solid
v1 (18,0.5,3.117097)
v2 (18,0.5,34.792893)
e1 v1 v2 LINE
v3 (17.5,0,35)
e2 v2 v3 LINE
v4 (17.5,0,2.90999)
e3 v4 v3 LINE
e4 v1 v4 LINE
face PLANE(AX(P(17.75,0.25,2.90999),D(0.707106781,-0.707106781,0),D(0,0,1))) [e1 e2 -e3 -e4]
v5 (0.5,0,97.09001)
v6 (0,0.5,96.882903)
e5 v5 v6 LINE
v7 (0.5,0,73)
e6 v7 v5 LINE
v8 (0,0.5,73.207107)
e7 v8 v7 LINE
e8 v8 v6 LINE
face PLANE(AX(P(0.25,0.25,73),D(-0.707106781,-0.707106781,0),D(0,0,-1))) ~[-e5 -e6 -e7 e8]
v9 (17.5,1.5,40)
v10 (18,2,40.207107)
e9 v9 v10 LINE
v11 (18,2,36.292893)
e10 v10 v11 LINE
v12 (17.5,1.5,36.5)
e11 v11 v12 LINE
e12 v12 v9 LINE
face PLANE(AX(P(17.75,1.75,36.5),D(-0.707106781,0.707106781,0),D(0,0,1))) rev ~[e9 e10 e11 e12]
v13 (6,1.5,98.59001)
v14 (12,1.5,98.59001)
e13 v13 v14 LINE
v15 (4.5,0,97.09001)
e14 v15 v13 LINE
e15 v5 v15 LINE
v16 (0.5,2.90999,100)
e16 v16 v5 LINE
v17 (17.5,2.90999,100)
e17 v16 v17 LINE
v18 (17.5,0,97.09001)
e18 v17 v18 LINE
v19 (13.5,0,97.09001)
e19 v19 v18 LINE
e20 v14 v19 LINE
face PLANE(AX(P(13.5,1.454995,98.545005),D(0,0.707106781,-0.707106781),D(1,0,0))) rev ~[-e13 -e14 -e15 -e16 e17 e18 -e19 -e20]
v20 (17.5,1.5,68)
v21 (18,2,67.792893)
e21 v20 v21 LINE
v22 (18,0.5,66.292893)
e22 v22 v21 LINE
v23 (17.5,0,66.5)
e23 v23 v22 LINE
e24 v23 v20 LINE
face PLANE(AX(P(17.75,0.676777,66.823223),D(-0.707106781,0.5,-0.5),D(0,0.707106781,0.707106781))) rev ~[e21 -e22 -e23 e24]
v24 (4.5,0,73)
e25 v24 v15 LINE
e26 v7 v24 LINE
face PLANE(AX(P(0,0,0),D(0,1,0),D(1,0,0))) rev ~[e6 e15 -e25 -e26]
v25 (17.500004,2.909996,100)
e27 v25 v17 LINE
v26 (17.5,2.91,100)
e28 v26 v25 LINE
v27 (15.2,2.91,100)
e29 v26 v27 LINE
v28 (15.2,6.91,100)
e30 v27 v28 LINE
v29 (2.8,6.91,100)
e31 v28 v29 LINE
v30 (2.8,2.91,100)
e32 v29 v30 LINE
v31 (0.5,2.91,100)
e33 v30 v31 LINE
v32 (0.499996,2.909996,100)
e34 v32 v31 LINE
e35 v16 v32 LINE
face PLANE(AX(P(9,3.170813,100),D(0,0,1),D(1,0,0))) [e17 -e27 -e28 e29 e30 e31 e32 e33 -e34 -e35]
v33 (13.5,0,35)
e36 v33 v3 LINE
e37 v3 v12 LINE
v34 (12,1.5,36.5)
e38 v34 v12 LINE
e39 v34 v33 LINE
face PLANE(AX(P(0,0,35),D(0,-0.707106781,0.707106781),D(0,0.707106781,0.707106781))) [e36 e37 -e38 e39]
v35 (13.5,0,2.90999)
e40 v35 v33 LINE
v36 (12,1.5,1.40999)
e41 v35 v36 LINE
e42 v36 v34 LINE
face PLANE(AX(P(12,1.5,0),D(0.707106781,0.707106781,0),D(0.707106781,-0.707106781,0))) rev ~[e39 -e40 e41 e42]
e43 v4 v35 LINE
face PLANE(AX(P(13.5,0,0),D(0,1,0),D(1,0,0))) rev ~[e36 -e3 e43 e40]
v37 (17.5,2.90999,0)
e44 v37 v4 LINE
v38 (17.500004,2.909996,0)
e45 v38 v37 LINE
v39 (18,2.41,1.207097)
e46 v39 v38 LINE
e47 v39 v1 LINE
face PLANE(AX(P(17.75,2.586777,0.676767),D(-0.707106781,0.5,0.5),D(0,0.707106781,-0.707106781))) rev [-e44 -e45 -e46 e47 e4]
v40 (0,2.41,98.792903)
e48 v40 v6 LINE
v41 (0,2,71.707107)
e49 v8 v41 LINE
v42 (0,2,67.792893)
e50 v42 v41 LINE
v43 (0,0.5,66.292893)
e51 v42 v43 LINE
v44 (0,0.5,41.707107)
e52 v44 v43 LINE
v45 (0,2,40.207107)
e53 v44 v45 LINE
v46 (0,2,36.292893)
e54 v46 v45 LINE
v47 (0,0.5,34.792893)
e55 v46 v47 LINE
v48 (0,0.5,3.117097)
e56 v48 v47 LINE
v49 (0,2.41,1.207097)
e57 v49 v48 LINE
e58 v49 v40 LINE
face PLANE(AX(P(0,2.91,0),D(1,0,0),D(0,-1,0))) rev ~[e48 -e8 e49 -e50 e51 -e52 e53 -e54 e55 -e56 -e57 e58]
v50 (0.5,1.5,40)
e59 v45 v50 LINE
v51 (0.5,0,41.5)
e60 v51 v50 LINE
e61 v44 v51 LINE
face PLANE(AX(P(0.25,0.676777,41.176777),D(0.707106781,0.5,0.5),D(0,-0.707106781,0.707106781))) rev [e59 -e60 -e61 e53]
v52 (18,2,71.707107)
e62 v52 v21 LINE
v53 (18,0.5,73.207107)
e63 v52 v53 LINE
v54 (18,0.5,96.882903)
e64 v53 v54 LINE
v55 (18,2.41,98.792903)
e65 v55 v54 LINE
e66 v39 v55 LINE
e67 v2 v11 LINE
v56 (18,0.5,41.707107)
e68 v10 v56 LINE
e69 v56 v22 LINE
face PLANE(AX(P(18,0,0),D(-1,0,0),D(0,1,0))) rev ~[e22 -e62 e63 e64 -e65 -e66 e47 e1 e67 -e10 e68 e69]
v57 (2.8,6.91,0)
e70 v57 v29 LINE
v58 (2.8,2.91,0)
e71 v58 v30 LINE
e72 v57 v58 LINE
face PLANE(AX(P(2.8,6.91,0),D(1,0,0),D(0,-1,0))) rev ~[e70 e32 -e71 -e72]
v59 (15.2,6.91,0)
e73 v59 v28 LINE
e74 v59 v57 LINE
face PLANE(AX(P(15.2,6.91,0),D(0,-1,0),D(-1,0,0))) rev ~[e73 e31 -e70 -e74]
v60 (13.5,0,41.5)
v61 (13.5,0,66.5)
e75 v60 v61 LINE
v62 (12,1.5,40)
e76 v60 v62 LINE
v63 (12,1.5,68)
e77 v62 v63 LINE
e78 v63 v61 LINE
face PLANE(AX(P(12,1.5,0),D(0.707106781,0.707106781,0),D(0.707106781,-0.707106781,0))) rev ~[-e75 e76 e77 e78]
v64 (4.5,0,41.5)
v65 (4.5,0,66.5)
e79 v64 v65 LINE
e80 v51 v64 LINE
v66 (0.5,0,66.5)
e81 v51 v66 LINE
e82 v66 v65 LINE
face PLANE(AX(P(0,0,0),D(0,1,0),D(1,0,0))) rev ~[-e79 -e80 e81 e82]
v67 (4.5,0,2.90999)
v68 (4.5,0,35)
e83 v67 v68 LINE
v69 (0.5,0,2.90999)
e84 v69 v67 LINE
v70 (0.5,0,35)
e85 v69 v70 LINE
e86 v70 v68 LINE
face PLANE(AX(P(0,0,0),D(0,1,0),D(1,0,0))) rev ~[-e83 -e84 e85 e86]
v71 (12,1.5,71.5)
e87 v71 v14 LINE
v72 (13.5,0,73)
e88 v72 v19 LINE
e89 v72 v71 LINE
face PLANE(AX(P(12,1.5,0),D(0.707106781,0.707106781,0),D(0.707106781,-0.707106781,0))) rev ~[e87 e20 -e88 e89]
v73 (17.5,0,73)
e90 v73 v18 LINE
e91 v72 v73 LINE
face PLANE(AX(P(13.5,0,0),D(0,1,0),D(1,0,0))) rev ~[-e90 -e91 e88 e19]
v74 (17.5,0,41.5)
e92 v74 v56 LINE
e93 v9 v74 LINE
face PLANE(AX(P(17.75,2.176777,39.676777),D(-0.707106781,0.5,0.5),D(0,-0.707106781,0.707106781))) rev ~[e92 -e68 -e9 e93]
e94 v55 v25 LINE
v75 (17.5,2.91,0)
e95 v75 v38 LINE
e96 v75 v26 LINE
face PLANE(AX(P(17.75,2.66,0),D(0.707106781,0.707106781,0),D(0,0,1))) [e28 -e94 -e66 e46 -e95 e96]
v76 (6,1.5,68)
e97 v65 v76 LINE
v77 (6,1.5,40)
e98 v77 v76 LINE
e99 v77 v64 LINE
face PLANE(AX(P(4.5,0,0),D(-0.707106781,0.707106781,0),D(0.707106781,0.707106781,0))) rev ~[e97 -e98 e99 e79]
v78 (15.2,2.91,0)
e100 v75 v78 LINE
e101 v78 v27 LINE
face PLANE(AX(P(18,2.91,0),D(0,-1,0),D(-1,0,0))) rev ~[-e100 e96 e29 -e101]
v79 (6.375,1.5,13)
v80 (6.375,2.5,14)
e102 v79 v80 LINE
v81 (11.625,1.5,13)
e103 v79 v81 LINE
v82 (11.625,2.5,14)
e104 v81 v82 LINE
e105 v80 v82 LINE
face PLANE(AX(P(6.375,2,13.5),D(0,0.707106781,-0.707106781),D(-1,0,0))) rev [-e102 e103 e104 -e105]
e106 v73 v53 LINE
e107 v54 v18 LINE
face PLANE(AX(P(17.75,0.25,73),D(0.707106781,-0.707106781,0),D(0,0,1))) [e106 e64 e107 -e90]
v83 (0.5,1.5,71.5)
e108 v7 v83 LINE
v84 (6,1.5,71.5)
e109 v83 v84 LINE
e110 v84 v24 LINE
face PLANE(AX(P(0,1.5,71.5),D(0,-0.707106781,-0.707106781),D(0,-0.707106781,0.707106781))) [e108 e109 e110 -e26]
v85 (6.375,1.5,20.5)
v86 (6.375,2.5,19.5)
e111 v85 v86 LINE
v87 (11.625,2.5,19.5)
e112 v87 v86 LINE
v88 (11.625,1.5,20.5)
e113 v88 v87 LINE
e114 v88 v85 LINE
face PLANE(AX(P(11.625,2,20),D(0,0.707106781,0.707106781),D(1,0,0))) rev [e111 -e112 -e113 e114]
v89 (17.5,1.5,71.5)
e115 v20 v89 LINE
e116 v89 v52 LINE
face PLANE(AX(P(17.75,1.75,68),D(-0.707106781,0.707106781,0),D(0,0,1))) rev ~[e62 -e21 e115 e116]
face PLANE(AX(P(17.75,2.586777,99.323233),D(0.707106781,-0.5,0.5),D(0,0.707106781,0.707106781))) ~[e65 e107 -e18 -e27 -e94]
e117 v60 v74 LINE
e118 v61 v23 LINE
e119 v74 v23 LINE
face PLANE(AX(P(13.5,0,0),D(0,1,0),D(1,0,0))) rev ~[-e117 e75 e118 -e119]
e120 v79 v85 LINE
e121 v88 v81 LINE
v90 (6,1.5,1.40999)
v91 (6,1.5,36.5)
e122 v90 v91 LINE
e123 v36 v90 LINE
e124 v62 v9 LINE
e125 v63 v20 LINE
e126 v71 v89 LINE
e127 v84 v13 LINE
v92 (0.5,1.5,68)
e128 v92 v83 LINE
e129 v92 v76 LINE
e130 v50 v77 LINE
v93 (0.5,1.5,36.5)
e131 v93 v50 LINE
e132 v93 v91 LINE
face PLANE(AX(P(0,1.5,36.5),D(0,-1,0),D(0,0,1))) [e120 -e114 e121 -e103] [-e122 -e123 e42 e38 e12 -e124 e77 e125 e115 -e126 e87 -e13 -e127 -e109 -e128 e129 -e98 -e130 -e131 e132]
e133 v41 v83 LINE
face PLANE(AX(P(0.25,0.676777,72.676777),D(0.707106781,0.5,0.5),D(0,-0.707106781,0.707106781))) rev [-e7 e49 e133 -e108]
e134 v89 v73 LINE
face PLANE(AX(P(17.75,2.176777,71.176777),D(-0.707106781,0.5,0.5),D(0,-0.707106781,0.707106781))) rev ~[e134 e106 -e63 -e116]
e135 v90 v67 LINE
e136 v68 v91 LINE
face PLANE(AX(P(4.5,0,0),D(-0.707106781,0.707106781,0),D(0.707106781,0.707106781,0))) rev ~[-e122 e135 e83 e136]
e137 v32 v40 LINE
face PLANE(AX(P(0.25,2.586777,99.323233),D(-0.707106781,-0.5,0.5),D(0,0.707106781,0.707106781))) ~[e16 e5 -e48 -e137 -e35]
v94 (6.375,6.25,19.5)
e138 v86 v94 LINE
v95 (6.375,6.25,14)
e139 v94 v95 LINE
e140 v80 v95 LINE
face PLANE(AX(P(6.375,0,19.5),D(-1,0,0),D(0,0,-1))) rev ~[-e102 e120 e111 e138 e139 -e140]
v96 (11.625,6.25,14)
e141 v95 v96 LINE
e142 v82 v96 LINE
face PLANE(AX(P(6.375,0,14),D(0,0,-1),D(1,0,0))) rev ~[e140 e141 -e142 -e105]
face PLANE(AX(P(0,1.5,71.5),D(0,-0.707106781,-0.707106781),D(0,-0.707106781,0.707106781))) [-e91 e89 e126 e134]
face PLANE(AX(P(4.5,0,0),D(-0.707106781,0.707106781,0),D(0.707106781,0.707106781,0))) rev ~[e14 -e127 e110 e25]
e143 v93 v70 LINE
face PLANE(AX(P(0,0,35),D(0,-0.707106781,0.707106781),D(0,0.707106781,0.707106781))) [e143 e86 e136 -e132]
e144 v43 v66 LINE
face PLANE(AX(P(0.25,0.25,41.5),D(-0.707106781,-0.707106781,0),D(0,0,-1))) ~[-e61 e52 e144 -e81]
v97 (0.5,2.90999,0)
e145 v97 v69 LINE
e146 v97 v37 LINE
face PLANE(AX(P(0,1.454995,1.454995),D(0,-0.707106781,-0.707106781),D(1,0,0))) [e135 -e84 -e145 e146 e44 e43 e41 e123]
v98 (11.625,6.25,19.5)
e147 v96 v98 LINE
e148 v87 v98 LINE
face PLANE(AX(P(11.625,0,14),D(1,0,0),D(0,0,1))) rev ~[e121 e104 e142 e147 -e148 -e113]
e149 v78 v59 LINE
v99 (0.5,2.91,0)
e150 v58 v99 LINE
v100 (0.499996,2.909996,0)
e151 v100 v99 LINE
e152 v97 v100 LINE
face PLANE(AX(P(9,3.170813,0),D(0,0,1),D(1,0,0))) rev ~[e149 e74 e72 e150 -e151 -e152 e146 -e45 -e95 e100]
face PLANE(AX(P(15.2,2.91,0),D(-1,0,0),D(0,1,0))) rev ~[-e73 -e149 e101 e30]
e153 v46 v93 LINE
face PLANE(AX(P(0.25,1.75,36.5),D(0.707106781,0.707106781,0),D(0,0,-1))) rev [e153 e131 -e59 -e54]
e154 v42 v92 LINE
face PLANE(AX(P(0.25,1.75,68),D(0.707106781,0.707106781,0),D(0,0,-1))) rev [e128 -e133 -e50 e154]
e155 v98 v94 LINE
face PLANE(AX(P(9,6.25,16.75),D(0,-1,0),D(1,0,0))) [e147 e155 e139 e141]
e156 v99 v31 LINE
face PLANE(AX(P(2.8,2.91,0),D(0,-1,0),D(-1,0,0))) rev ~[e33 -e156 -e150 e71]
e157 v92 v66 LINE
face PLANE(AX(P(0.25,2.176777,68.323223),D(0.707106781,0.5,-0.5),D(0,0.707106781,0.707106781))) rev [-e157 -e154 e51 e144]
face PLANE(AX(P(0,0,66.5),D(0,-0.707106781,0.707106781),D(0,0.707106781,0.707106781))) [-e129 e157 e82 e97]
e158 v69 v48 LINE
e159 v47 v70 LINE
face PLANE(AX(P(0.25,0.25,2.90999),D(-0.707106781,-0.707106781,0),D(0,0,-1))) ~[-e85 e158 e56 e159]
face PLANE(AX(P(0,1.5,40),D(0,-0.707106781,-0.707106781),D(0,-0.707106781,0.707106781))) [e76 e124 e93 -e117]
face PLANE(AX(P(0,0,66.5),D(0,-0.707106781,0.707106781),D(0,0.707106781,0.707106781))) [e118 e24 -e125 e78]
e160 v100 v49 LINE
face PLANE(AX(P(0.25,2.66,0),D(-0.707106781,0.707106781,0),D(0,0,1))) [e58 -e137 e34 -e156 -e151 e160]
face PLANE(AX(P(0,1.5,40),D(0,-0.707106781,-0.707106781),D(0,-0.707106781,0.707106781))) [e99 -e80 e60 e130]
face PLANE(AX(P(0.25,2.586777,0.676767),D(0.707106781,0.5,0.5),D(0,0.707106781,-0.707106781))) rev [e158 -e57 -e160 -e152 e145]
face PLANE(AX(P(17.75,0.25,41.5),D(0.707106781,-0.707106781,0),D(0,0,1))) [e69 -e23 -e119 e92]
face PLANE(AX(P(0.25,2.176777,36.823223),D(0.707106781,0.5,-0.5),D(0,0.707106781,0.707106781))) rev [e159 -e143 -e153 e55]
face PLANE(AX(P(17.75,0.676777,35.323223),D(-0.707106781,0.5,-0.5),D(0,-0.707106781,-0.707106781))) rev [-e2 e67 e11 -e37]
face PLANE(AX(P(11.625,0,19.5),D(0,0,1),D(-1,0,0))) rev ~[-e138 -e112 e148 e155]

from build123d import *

# Parameters (mm, degrees)
F1_DEPTH      = 100
F3_DEPTH      = 25
F3_DEPTH_BACK = 25
F4_SIZE       = 2.90999
F5_SIZE       = 2.90999
F7_DEPTH      = 6.25
F8_SIZE       = 1
F9_C1_SIZE    = 0.5
F9_C2_SIZE    = 0.5
F9_C3_SIZE    = 0.5
F9_C4_SIZE    = 0.5
F9_C5_SIZE    = 0.5
F9_C6_SIZE    = 0.5
F9_C7_SIZE    = 0.5
F9_C8_SIZE    = 0.5
F9_C9_SIZE    = 0.5
F9_C10_SIZE   = 0.5
F9_C11_SIZE   = 0.5
F9_C12_SIZE   = 0.5
F9_C13_SIZE   = 0.5
F9_C14_SIZE   = 0.5
F9_C15_SIZE   = 0.5
F9_C16_SIZE   = 0.5
F9_C17_SIZE   = 0.5
F9_C18_SIZE   = 0.5
F9_C19_SIZE   = 0.5
F9_C20_SIZE   = 0.5
F9_C21_SIZE   = 0.5
F9_C22_SIZE   = 0.5
F9_C23_SIZE   = 0.5
F9_C24_SIZE   = 0.5


# Not quite as in the source:
# - a fillet or chamfer is up to 0.001 mm smaller than in the source, because OpenCascade refuses the exact size


with BuildPart() as f1:
    # F0 (on Top) → F1 (new body)
    with BuildSketch(Plane.XY):
        Polygon((0, 2.91), (0, 0), (4.5, 0), (6, 1.5), (12, 1.5), (13.5, 0), (18, 0), (18, 2.91), (15.2, 2.91), (15.2, 6.91), (2.8, 6.91), (2.8, 2.91), align=None)
    extrude(amount=F1_DEPTH)

    # F2 (on Right) → F3 (cut, two sides)
    with BuildSketch(Plane.YZ) as f3_sk:
        Polygon((-0.9837878169, 0), (0, 0), (0, 35), (1.5, 36.5), (1.5, 40), (0, 41.5), (0, 66.5), (1.5, 68), (1.5, 71.5), (0, 73), (0, 100.0014618039), (-0.9837878169, 100.0014618039), align=None)
    extrude(amount=-F3_DEPTH, mode=Mode.SUBTRACT)
    extrude(f3_sk.sketch, amount=F3_DEPTH_BACK, mode=Mode.SUBTRACT)

    # F4 (size 2.91 in the source; OpenCascade refuses exactly that, so slightly less here)
    f4_edges = [f1.edges().sort_by_distance(p)[0] for p in [
        (2.25, 0, 0),
    ]]
    chamfer(f4_edges, length=F4_SIZE)

    # F5 (size 2.91 in the source; OpenCascade refuses exactly that, so slightly less here)
    f5_edges = [f1.edges().sort_by_distance(p)[0] for p in [
        (15.75, 0, 100),
    ]]
    chamfer(f5_edges, length=F5_SIZE)

    # F6 (on Front) → F7 (cut)
    with BuildSketch(Plane.XZ):
        Polygon((6.375, 14), (9, 14), (11.625, 14), (11.625, 19.5), (6.375, 19.5), align=None)
    extrude(amount=-F7_DEPTH, mode=Mode.SUBTRACT)

    # F8
    f8_edges = [f1.edges().sort_by_distance(p)[0] for p in [
        (9, 1.5, 14),
        (9, 1.5, 19.5),
    ]]
    chamfer(f8_edges, length=F8_SIZE)

    # F9: chamfer of 0.5 on 28 edges, made by hand

    # F9_c1
    f9_c1_edges = [f1.edges().sort_by_distance(p)[0] for p in [
        (18, 2.91, 50),
    ]]
    chamfer(f9_c1_edges, length=F9_C1_SIZE)

    # F9_c2
    f9_c2_edges = [f1.edges().sort_by_distance(p)[0] for p in [
        (0, 2.91, 50),
    ]]
    chamfer(f9_c2_edges, length=F9_C2_SIZE)

    # F9_c3
    f9_c3_edges = [f1.edges().sort_by_distance(p)[0] for p in [
        (18, 0, 18.954995),
    ]]
    chamfer(f9_c3_edges, length=F9_C3_SIZE)

    # F9_c4
    f9_c4_edges = [f1.edges().sort_by_distance(p)[0] for p in [
        (0, 0, 18.954995),
    ]]
    chamfer(f9_c4_edges, length=F9_C4_SIZE)

    # F9_c5
    f9_c5_edges = [f1.edges().sort_by_distance(p)[0] for p in [
        (18, 0, 54),
    ]]
    chamfer(f9_c5_edges, length=F9_C5_SIZE)

    # F9_c6
    f9_c6_edges = [f1.edges().sort_by_distance(p)[0] for p in [
        (0, 0, 54),
    ]]
    chamfer(f9_c6_edges, length=F9_C6_SIZE)

    # F9_c7
    f9_c7_edges = [f1.edges().sort_by_distance(p)[0] for p in [
        (0, 0, 85.045005),
    ]]
    chamfer(f9_c7_edges, length=F9_C7_SIZE)

    # F9_c8
    f9_c8_edges = [f1.edges().sort_by_distance(p)[0] for p in [
        (18, 0, 85.045005),
    ]]
    chamfer(f9_c8_edges, length=F9_C8_SIZE)

    # F9_c9
    f9_c9_edges = [f1.edges().sort_by_distance(p)[0] for p in [
        (18, 1.455, 1.45499),
    ]]
    chamfer(f9_c9_edges, length=F9_C9_SIZE)

    # F9_c10
    f9_c10_edges = [f1.edges().sort_by_distance(p)[0] for p in [
        (0, 1.455, 1.45499),
    ]]
    chamfer(f9_c10_edges, length=F9_C10_SIZE)

    # F9_c11
    f9_c11_edges = [f1.edges().sort_by_distance(p)[0] for p in [
        (18, 1.455, 98.54501),
    ]]
    chamfer(f9_c11_edges, length=F9_C11_SIZE)

    # F9_c12
    f9_c12_edges = [f1.edges().sort_by_distance(p)[0] for p in [
        (0, 1.455, 98.54501),
    ]]
    chamfer(f9_c12_edges, length=F9_C12_SIZE)

    # F9_c13
    f9_c13_edges = [f1.edges().sort_by_distance(p)[0] for p in [
        (18, 1.5, 69.75),
    ]]
    chamfer(f9_c13_edges, length=F9_C13_SIZE)

    # F9_c14
    f9_c14_edges = [f1.edges().sort_by_distance(p)[0] for p in [
        (0, 1.5, 69.75),
    ]]
    chamfer(f9_c14_edges, length=F9_C14_SIZE)

    # F9_c15
    f9_c15_edges = [f1.edges().sort_by_distance(p)[0] for p in [
        (18, 1.5, 38.25),
    ]]
    chamfer(f9_c15_edges, length=F9_C15_SIZE)

    # F9_c16
    f9_c16_edges = [f1.edges().sort_by_distance(p)[0] for p in [
        (0, 1.5, 38.25),
    ]]
    chamfer(f9_c16_edges, length=F9_C16_SIZE)

    # F9_c17
    f9_c17_edges = [f1.edges().sort_by_distance(p)[0] for p in [
        (18, 1, 36),
    ]]
    chamfer(f9_c17_edges, length=F9_C17_SIZE)

    # F9_c18
    f9_c18_edges = [f1.edges().sort_by_distance(p)[0] for p in [
        (18, 1, 40.5),
    ]]
    chamfer(f9_c18_edges, length=F9_C18_SIZE)

    # F9_c19
    f9_c19_edges = [f1.edges().sort_by_distance(p)[0] for p in [
        (0, 1, 72),
    ]]
    chamfer(f9_c19_edges, length=F9_C19_SIZE)

    # F9_c20
    f9_c20_edges = [f1.edges().sort_by_distance(p)[0] for p in [
        (18, 1, 72),
    ]]
    chamfer(f9_c20_edges, length=F9_C20_SIZE)

    # F9_c21
    f9_c21_edges = [f1.edges().sort_by_distance(p)[0] for p in [
        (18, 1, 67.5),
    ]]
    chamfer(f9_c21_edges, length=F9_C21_SIZE)

    # F9_c22
    f9_c22_edges = [f1.edges().sort_by_distance(p)[0] for p in [
        (0, 1, 36),
    ]]
    chamfer(f9_c22_edges, length=F9_C22_SIZE)

    # F9_c23
    f9_c23_edges = [f1.edges().sort_by_distance(p)[0] for p in [
        (0, 1, 40.5),
    ]]
    chamfer(f9_c23_edges, length=F9_C23_SIZE)

    # F9_c24
    f9_c24_edges = [f1.edges().sort_by_distance(p)[0] for p in [
        (0, 1, 67.5),
    ]]
    chamfer(f9_c24_edges, length=F9_C24_SIZE)


solid = f1.part
